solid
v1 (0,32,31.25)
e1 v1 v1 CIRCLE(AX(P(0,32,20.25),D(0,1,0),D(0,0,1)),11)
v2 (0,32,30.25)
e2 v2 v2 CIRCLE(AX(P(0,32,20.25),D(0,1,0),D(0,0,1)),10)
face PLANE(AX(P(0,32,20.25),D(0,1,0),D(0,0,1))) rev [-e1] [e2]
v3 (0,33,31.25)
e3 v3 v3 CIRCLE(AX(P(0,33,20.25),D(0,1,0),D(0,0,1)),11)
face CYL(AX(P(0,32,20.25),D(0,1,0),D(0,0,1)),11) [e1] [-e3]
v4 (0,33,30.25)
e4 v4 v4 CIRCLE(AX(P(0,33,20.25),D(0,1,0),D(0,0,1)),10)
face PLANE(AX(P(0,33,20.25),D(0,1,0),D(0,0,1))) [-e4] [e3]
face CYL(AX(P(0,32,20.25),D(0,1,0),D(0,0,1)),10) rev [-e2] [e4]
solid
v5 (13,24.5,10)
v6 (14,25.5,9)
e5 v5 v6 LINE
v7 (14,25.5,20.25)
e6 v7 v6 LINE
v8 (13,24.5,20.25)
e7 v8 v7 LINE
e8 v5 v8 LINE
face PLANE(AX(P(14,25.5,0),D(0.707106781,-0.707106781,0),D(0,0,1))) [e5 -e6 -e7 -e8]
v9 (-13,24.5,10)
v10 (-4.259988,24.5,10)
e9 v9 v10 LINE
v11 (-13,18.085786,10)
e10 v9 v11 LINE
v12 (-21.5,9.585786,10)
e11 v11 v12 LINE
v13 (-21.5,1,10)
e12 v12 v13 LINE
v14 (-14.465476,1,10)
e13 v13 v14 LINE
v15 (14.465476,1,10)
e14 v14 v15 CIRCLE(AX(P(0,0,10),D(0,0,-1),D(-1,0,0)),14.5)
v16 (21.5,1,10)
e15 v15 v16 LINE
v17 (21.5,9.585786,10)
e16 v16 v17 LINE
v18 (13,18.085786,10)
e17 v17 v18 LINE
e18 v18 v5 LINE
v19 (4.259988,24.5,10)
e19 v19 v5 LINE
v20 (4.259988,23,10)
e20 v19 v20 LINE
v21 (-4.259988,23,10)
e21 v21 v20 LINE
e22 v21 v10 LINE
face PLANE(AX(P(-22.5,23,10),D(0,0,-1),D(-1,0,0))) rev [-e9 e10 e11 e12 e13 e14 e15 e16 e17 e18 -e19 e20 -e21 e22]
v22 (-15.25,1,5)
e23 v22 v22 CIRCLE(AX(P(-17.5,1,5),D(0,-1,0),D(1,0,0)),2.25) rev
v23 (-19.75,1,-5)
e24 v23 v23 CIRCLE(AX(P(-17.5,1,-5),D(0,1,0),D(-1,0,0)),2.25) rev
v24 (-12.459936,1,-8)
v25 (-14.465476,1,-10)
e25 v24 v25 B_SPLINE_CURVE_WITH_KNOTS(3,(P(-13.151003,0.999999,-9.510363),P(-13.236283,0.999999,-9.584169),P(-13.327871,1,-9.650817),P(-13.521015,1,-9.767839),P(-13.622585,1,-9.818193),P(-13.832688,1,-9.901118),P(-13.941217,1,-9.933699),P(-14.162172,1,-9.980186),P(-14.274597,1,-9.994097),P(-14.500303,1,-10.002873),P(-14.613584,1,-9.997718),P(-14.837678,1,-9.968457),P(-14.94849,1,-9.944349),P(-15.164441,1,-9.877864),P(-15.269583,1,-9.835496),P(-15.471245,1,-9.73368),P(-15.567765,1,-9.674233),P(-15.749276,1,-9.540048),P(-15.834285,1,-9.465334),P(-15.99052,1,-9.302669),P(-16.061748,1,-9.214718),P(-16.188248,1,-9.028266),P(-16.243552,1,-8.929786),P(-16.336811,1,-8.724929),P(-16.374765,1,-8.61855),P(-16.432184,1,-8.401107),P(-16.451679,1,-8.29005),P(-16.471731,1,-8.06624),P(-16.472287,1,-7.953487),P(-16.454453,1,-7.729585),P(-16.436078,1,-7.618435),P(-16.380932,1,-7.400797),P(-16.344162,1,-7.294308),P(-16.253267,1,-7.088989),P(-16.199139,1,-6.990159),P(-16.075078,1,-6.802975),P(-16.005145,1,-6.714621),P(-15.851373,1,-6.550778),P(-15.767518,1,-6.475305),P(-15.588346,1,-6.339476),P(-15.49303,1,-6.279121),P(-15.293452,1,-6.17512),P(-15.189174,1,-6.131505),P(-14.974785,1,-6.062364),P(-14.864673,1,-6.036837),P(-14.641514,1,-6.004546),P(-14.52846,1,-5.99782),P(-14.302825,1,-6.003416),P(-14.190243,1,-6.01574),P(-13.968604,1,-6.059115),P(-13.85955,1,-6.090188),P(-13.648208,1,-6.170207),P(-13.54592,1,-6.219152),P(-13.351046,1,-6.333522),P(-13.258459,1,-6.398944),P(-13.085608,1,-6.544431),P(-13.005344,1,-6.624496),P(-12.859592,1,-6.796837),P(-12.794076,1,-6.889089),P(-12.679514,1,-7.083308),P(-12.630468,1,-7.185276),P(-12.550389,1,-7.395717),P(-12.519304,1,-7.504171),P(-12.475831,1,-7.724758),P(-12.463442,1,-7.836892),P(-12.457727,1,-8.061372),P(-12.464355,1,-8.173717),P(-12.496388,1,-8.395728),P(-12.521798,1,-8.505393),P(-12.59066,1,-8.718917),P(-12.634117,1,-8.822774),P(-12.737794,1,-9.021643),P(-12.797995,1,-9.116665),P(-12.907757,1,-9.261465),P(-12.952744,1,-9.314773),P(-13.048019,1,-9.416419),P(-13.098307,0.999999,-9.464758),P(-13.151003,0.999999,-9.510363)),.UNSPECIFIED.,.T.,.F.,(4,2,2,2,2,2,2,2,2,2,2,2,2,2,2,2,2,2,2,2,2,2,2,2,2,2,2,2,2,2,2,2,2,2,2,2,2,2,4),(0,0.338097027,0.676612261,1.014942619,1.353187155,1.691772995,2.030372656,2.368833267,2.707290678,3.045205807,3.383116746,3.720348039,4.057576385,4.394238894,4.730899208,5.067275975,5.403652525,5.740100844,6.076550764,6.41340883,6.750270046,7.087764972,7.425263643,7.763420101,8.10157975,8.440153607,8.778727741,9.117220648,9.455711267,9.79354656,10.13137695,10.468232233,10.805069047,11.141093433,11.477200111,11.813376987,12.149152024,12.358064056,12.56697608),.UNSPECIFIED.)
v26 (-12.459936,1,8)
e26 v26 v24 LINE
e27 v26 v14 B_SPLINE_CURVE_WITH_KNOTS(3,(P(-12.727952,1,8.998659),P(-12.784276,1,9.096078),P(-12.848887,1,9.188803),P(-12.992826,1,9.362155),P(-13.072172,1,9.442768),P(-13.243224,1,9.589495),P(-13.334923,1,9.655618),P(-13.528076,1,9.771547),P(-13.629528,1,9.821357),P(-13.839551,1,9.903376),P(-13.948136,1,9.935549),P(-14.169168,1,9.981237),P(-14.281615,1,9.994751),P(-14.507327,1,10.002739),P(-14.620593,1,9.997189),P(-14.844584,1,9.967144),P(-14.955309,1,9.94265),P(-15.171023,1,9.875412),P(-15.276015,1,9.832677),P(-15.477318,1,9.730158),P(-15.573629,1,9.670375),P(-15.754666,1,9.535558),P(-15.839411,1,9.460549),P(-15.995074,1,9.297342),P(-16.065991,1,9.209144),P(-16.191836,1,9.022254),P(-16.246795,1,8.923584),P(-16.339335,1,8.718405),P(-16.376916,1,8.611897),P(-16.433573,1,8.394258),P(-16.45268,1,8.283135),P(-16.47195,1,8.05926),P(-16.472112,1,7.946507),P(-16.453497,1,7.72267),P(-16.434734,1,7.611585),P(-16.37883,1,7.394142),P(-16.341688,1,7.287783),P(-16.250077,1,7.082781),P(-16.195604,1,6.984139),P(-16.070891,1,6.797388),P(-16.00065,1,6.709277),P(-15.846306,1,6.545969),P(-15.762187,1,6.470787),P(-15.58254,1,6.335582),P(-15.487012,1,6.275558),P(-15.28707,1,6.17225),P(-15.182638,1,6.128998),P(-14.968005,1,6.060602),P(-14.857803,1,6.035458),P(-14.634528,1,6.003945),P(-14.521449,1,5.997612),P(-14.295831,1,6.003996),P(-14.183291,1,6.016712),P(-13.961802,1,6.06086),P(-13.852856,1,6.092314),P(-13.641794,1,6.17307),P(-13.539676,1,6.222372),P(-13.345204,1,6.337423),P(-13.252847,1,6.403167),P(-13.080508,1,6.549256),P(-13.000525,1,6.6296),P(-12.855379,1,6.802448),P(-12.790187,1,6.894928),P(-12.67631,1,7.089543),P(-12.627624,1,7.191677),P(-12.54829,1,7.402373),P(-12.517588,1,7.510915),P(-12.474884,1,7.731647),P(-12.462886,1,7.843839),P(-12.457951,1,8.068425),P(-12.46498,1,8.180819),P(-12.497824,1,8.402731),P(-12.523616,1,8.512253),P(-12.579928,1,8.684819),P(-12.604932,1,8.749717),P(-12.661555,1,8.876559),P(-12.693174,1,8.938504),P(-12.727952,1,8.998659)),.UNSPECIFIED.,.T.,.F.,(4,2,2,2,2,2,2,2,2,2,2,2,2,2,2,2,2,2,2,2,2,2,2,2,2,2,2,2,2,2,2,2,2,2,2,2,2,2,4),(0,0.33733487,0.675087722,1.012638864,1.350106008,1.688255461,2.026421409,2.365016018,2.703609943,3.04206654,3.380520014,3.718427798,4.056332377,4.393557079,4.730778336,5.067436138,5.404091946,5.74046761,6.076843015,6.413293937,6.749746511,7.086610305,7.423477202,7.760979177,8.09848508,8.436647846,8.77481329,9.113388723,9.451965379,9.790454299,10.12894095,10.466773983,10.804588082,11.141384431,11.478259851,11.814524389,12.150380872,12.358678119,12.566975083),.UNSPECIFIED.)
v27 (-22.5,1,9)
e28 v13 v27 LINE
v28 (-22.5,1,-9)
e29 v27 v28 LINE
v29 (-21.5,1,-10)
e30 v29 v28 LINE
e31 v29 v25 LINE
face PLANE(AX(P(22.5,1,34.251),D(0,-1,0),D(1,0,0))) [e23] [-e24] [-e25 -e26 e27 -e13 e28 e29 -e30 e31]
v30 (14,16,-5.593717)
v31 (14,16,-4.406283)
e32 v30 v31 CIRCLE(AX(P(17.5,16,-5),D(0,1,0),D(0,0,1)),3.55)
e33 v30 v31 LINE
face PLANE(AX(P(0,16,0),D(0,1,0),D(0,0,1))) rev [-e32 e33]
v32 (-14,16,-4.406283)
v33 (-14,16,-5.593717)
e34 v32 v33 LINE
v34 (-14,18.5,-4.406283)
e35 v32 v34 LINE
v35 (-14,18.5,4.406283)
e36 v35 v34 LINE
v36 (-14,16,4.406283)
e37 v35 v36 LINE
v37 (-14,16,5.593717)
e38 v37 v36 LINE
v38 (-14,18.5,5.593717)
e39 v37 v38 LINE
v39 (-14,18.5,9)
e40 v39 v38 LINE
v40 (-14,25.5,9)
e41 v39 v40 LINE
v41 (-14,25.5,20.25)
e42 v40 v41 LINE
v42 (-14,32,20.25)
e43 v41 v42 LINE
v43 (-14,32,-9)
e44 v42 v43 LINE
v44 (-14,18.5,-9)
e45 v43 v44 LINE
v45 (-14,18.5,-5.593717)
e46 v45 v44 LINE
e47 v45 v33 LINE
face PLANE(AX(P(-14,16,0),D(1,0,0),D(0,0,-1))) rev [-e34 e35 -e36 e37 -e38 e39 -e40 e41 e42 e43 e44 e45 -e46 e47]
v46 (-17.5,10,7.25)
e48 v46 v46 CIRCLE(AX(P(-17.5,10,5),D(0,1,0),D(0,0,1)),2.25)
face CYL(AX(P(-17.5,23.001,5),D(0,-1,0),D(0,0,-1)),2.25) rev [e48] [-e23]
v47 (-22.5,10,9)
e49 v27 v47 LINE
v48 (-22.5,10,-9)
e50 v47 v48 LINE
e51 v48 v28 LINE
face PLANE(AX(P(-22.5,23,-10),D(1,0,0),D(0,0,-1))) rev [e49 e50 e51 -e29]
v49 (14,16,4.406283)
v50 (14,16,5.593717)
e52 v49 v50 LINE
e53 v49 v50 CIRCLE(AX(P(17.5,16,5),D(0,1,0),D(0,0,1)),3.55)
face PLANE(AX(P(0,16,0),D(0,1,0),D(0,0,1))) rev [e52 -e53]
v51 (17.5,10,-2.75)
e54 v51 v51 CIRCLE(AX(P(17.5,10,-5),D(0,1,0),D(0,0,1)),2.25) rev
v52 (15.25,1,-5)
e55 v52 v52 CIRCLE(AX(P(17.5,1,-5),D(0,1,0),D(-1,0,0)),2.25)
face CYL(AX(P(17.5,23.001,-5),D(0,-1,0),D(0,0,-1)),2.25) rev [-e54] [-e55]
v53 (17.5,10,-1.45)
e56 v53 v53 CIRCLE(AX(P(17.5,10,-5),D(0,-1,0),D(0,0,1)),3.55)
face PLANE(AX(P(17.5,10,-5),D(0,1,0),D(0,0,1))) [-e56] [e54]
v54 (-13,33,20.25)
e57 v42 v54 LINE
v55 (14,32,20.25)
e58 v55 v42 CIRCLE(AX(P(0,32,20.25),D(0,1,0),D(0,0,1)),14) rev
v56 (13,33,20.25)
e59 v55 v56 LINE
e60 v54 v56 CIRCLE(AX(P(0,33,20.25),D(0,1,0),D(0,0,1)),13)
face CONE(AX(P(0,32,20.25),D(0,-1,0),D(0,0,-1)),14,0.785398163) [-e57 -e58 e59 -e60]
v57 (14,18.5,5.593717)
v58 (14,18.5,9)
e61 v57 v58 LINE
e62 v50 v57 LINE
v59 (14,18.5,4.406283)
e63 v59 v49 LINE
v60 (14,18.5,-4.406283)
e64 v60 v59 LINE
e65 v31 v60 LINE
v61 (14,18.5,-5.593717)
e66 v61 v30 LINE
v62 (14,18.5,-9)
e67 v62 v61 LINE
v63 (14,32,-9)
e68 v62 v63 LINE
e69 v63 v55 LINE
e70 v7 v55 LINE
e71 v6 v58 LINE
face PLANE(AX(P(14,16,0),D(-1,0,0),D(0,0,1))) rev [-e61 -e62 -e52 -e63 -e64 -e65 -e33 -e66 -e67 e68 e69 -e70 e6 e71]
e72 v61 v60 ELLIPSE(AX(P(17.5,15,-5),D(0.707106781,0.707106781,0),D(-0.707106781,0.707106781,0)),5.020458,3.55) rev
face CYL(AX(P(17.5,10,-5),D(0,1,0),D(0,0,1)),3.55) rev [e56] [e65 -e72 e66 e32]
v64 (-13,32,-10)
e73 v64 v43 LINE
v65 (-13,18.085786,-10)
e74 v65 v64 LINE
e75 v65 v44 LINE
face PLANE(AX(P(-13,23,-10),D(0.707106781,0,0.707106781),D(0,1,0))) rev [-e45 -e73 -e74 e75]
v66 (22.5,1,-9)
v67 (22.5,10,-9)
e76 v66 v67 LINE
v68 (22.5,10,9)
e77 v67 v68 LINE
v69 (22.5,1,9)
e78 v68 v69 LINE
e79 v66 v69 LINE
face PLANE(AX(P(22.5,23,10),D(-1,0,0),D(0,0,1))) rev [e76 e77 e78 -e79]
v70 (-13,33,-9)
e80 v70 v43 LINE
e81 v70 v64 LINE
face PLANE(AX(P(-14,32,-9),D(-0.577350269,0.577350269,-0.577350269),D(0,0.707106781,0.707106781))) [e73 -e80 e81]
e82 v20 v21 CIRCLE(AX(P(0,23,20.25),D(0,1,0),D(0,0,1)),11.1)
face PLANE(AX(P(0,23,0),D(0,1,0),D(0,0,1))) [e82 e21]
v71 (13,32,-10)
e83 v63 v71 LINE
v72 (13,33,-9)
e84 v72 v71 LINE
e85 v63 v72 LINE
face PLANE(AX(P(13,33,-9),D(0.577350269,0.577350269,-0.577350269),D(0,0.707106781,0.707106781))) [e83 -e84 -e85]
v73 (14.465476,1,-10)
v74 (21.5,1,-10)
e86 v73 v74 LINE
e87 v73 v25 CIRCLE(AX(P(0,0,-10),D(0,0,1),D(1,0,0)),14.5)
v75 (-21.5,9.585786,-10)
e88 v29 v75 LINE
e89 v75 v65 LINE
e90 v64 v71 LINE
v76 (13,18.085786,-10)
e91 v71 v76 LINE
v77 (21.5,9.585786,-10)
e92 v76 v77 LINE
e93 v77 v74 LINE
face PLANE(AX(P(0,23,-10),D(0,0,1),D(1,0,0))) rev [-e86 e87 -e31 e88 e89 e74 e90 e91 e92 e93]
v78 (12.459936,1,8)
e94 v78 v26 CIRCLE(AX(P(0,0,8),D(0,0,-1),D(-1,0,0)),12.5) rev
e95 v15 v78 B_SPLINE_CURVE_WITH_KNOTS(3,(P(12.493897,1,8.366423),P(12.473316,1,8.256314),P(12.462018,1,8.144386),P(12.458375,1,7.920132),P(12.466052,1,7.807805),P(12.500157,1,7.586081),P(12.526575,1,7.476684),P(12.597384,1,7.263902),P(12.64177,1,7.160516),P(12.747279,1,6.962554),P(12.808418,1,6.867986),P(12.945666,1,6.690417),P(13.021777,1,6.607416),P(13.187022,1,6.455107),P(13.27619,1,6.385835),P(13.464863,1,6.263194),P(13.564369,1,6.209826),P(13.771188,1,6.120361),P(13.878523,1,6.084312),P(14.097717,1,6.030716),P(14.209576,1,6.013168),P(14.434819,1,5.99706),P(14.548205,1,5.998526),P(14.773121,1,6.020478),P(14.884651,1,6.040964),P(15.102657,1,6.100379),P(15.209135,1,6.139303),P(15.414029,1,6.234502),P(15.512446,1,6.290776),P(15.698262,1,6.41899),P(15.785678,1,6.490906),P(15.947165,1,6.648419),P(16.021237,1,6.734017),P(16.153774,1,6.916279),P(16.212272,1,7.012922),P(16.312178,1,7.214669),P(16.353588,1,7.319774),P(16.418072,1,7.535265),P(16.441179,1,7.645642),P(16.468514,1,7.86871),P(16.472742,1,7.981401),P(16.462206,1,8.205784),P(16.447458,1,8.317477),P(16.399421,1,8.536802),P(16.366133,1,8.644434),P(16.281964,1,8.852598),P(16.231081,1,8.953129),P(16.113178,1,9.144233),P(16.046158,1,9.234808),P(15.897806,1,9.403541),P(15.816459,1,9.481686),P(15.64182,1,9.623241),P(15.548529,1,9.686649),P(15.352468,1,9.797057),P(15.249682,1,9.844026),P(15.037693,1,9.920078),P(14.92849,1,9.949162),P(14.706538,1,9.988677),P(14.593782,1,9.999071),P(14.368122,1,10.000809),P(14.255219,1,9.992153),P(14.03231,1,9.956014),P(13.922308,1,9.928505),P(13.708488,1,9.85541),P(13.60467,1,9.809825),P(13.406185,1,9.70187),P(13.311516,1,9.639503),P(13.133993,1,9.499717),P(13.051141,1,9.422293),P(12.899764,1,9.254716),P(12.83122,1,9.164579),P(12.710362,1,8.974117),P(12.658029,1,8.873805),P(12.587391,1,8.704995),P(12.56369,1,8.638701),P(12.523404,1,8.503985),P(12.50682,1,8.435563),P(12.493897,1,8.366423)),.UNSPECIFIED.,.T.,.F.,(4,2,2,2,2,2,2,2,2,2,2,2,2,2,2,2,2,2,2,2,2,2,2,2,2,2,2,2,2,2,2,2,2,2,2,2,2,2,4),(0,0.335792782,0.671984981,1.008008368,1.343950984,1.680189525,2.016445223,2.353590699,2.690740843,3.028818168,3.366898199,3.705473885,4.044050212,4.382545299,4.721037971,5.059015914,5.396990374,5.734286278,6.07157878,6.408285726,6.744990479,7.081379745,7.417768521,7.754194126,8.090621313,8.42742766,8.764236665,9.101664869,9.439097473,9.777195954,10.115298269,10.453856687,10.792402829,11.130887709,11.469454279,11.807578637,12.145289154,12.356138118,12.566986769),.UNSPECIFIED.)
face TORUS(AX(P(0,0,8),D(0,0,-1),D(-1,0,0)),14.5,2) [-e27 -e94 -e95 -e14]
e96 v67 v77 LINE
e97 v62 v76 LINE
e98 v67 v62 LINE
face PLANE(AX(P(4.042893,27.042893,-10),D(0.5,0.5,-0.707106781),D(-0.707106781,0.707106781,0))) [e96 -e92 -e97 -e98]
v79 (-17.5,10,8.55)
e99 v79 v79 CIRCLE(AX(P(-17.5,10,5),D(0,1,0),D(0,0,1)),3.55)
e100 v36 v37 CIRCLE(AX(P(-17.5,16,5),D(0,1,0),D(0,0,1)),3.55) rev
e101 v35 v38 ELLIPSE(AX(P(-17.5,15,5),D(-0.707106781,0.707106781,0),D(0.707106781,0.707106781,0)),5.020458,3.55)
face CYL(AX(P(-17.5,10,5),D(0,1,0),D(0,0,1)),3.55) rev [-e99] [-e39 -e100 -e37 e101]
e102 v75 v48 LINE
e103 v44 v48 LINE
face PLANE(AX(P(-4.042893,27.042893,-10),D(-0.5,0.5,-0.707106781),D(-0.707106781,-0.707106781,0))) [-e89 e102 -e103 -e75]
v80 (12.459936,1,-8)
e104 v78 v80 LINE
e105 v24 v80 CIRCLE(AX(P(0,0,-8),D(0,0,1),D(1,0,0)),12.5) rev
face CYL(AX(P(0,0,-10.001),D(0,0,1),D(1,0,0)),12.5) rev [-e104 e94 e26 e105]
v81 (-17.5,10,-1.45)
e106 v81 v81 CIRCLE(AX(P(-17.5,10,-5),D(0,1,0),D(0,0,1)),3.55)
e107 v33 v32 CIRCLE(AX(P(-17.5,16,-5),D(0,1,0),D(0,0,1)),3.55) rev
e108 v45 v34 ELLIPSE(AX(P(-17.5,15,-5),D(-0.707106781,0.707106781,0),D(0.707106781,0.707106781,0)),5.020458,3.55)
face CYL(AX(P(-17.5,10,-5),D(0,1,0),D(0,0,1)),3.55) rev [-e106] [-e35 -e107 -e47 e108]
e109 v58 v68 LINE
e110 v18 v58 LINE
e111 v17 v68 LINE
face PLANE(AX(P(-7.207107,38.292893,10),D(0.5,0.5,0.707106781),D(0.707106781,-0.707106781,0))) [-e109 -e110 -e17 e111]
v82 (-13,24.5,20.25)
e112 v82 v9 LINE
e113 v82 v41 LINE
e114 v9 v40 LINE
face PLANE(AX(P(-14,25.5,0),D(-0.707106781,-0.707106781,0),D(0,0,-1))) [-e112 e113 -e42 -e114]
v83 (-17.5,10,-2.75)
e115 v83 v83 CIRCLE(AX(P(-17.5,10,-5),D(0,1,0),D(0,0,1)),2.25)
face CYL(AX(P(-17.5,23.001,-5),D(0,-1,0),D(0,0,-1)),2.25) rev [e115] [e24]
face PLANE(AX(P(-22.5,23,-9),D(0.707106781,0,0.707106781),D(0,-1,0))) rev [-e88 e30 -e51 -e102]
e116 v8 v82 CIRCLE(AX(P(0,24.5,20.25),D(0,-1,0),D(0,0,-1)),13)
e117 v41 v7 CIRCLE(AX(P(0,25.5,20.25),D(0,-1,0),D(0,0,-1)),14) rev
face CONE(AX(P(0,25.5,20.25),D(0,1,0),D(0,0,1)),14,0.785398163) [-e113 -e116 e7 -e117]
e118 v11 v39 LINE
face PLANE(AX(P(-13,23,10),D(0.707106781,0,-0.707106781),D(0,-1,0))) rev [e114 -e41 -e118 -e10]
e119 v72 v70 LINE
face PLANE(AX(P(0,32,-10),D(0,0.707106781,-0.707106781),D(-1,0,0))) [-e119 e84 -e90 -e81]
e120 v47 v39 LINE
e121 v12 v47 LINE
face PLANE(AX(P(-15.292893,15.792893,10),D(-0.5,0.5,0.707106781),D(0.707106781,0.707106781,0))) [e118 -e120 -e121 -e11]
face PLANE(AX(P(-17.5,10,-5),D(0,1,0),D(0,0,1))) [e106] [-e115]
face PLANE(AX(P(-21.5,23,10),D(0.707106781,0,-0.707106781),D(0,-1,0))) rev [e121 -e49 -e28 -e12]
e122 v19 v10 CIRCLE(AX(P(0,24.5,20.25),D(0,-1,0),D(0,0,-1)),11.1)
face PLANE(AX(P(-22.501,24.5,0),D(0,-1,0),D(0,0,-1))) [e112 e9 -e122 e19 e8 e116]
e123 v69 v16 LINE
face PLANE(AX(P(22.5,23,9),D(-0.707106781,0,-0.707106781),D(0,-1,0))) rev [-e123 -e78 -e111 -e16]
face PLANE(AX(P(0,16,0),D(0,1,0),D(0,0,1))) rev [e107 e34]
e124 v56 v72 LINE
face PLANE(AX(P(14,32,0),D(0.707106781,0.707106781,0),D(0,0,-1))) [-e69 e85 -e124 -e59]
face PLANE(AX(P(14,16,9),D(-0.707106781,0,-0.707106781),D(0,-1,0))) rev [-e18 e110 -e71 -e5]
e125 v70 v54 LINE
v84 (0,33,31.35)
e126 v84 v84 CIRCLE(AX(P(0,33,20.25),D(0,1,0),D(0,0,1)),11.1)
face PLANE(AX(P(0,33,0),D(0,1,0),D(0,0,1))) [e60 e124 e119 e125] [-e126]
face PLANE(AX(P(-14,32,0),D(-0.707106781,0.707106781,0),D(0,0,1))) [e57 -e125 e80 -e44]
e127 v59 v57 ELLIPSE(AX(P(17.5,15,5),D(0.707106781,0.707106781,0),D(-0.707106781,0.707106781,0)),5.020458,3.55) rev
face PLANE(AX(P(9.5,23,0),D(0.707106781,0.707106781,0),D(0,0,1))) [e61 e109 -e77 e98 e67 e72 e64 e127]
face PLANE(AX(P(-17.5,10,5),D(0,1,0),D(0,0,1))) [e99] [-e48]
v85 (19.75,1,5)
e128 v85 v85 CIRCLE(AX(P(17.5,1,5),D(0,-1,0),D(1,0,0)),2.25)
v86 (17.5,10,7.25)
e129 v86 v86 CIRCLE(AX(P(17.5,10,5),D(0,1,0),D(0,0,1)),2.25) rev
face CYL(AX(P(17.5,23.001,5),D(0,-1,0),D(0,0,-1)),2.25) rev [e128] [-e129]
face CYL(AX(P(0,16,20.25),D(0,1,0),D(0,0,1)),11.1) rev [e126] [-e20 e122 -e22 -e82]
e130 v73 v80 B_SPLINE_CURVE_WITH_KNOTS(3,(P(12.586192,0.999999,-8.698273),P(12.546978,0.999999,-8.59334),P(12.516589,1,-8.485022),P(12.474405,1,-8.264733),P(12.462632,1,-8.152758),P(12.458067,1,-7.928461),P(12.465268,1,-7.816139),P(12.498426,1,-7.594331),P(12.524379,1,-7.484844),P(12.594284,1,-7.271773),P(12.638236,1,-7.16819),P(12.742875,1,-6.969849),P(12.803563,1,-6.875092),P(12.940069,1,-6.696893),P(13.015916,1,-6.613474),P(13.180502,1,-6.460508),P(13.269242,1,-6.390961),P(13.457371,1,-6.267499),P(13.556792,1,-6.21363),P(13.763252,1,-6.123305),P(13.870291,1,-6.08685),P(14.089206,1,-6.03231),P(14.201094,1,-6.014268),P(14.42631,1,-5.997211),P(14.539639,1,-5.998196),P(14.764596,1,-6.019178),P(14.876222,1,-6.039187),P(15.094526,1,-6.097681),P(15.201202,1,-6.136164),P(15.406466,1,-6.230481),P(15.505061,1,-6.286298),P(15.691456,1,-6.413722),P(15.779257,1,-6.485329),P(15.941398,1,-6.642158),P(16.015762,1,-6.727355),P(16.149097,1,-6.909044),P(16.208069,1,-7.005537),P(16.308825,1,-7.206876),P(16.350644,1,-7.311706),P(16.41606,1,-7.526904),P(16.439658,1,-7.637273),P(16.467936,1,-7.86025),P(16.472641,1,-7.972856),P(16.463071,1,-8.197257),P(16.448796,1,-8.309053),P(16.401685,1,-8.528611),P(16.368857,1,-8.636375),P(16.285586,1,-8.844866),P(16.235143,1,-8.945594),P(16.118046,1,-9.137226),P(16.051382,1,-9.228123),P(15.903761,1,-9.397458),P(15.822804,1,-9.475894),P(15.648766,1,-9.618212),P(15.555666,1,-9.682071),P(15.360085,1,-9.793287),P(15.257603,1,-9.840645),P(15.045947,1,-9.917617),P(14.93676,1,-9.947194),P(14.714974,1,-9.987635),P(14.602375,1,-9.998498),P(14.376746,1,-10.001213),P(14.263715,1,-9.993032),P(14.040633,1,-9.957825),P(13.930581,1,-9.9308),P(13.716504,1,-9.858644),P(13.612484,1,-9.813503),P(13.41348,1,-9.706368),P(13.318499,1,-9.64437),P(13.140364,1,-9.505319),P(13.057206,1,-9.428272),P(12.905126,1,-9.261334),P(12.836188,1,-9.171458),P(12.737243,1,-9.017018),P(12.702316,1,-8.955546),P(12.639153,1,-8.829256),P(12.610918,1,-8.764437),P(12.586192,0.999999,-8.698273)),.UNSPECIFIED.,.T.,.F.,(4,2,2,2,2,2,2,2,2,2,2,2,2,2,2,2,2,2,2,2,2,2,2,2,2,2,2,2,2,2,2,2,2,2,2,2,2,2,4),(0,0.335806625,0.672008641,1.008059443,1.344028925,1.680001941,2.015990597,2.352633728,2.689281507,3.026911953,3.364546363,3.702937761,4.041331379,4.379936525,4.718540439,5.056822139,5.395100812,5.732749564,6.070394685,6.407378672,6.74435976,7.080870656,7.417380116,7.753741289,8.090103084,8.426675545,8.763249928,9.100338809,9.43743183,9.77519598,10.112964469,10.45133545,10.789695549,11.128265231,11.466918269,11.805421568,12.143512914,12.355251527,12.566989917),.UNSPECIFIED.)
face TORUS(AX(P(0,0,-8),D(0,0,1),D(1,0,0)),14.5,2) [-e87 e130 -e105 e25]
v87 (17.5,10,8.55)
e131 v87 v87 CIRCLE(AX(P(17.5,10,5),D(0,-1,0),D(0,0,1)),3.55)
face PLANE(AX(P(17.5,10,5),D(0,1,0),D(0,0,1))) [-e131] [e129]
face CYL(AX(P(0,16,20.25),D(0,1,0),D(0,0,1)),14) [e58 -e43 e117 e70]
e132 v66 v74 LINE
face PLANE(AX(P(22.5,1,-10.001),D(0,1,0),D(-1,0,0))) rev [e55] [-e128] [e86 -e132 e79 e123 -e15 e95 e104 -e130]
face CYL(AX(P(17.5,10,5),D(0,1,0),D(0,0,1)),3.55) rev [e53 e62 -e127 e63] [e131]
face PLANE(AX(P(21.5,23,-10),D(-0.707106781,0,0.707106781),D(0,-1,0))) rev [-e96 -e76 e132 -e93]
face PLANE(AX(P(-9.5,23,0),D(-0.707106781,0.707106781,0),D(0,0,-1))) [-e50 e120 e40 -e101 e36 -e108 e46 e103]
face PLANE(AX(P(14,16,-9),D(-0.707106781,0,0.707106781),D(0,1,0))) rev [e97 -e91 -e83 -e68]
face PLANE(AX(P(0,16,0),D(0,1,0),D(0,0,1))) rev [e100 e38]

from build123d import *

# Parameters (mm, degrees)
BOSS_EXTRUDE1_DEPTH      = 23
CUT_EXTRUDE1_REACH       = 39.885
CUT_EXTRUDE2_REACH       = 35.693
SKETCH3_R                = 2.25
CUT_EXTRUDE3_START       = 23
SKETCH4_R                = 3.55
CUT_EXTRUDE3_DEPTH       = 13
FILLET1_R                = 2
CHAMFER1_SIZE            = 13
BOSS_EXTRUDE2_DEPTH      = 10
BOSS_EXTRUDE2_DEPTH_BACK = 7
SKETCH6_R                = 11.1
CUT_EXTRUDE4_START       = -128
SKETCH7_W                = 24.25
SKETCH7_H                = 8.5
CUT_EXTRUDE4_DEPTH       = 28
EXTRUDE_THIN1_START      = -10
SKETCH8_R                = 11
SKETCH8_R_2              = 10
EXTRUDE_THIN1_DEPTH      = 1
CHAMFER2_SIZE            = 1
CUT_EXTRUDE5_DEPTH       = 10
CUT_EXTRUDE5_DEPTH_BACK  = 10
SKETCH9_W                = 45
SKETCH9_H                = 1


with BuildPart() as part:
    # Sketch1 → Boss-Extrude1 (new body)
    with BuildSketch(Plane(origin=(0, 0, 0), x_dir=(1, 0, 0), z_dir=(0, 1, 0))):
        Polygon((0, 10), (-22.5, 10), (-22.5, -10), (22.5, -10), (22.5, 10), align=None)
    extrude(amount=BOSS_EXTRUDE1_DEPTH)

    # Sketch2 → Cut-Extrude1 (cut, up to next)
    with BuildSketch(Plane.XY.offset(10), mode=Mode.PRIVATE) as cut_extrude1_sk1:
        with BuildLine():
            Line((-12.5, 0), (-22.5, 0))
            Line((-22.5, 0), (-22.5, -2.522641864))
            Line((-22.5, -2.522641864), (22.5, -2.522641864))
            Line((22.5, -2.522641864), (22.5, 0))
            Line((22.5, 0), (12.5, 0))
            ThreePointArc((12.5, 0), (0, 12.5), (-12.5, 0))
        make_face()
    cut_extrude1_tool1 = extrude(cut_extrude1_sk1.sketch, amount=-CUT_EXTRUDE1_REACH, mode=Mode.PRIVATE) & part.part
    add(cut_extrude1_tool1.solids().sort_by_distance((0, 3.22853, 10))[0], mode=Mode.SUBTRACT)

    # Sketch3 → Cut-Extrude2 (cut, up to next)
    with BuildSketch(Plane(origin=(0, 0, 0), x_dir=(1, 0, 0), z_dir=(0, 1, 0)), mode=Mode.PRIVATE) as cut_extrude2_sk1:
        with Locations(Location((-17.5, -5, 0), (0, 0, 270))):
            Circle(SKETCH3_R)
    cut_extrude2_tool1 = extrude(cut_extrude2_sk1.sketch, amount=CUT_EXTRUDE2_REACH, mode=Mode.PRIVATE) & part.part
    # Sketch3 → Cut-Extrude2 (cut, up to next)
    with BuildSketch(Plane(origin=(0, 0, 0), x_dir=(1, 0, 0), z_dir=(0, 1, 0)), mode=Mode.PRIVATE) as cut_extrude2_sk2:
        with Locations(Location((-17.5, 5, 0), (0, 0, 270))):
            Circle(SKETCH3_R)
    cut_extrude2_tool2 = extrude(cut_extrude2_sk2.sketch, amount=CUT_EXTRUDE2_REACH, mode=Mode.PRIVATE) & part.part
    cut_extrude2_1 = cut_extrude2_tool1.solids().sort_by_distance((-17.5, 0, 5))[0]
    add(cut_extrude2_1, mode=Mode.SUBTRACT)
    cut_extrude2_2 = cut_extrude2_tool2.solids().sort_by_distance((-17.5, 0, -5))[0]
    add(cut_extrude2_2, mode=Mode.SUBTRACT)
    cut_extrude2 = cut_extrude2_1 + cut_extrude2_2  # Cut-Extrude2 as one shape, for the pattern or mirror that repeats it

    # Mirror1: Cut-Extrude2 across plane
    add(cut_extrude2.mirror(Plane(origin=(0, 0, 0), x_dir=(0, 0, 1), z_dir=(1, 0, 0))), mode=Mode.SUBTRACT)

    # Sketch4 → Cut-Extrude3 (cut)
    with BuildSketch(Plane(origin=(0, 0, 0), x_dir=(1, 0, 0), z_dir=(0, 1, 0)).offset(CUT_EXTRUDE3_START)):
        with Locations(Location((-17.5, 5, 0), (0, 0, 270))):
            Circle(SKETCH4_R)
        with Locations(Location((-17.5, -5, 0), (0, 0, 270))):
            Circle(SKETCH4_R)
    cut_extrude3 = extrude(amount=-CUT_EXTRUDE3_DEPTH, mode=Mode.SUBTRACT)

    # Mirror2: Cut-Extrude3 across plane
    add(cut_extrude3.mirror(Plane(origin=(0, 0, 0), x_dir=(0, 0, 1), z_dir=(1, 0, 0))), mode=Mode.SUBTRACT)

    # Fillet1
    fillet1_edges = [part.edges().sort_by_distance(p)[0] for p in [
        (0, 12.5, 10),
        (0, 12.5, -10),
    ]]
    fillet(fillet1_edges, radius=FILLET1_R)

    # Chamfer1
    # the kernel refuses this chamfer: 13 mm, written as the material it takes off along each edge
    with BuildSketch(Plane(origin=(-22.5, 23, -43.431878844), x_dir=(0.9996219169112968, 0.027495876610586424, 0), z_dir=(0, 0, 1))) as chamfer1_piece_1:
        Polygon((CHAMFER1_SIZE * 0.999621916911, -CHAMFER1_SIZE * 0.0274958766106), (-CHAMFER1_SIZE * 0.0274958766106, -CHAMFER1_SIZE * 0.999621916911), (0, 0), align=None)
    extrude(amount=86.863757687, mode=Mode.SUBTRACT)
    with BuildSketch(Plane(origin=(22.5, 23, 43.431878844), x_dir=(0.027495876610586424, -0.9996219169112968, 0), z_dir=(0, 0, -1))) as chamfer1_piece_2:
        Polygon((CHAMFER1_SIZE * 0.999621916911, CHAMFER1_SIZE * 0.0274958766106), (-CHAMFER1_SIZE * 0.0274958766106, CHAMFER1_SIZE * 0.999621916911), (0, 0), align=None)
    extrude(amount=86.863757687, mode=Mode.SUBTRACT)

    # Sketch6 → Boss-Extrude2 (add, two sides: drawn at the far end of the back side and taken through both)
    with BuildSketch(Plane(origin=(0, 23, 0), x_dir=(1, 0, 0), z_dir=(0, 1, 0)).offset(-BOSS_EXTRUDE2_DEPTH_BACK)):
        with BuildLine():
            ThreePointArc((14, -20.25), (0, -34.25), (-14, -20.25))
            Line((-14, -20.25), (-14, -10))
            Line((-14, -10), (-14, 10))
            Line((-14, 10), (14, 10))
            Line((14, 10), (14, -10))
            Line((14, -10), (14, -20.25))
        make_face()
        with Locations(Location((0, -20.25, 0), (0, 0, 270))):
            Circle(SKETCH6_R, mode=Mode.SUBTRACT)
    extrude(amount=BOSS_EXTRUDE2_DEPTH + BOSS_EXTRUDE2_DEPTH_BACK)

    # Sketch7 → Cut-Extrude4 (cut)
    with BuildSketch(Plane(origin=(114, 0, 0), x_dir=(0, 0, -1), z_dir=(1, 0, 0)).offset(CUT_EXTRUDE4_START)):
        with Locations((-22.125, 20.25)):
            Rectangle(SKETCH7_W, SKETCH7_H)
    extrude(amount=CUT_EXTRUDE4_DEPTH, mode=Mode.SUBTRACT)

    # Chamfer2
    chamfer2_edges = [part.edges().sort_by_distance(p)[0] for p in [
        (14, 25.75, -10),
        (14, 33, 5.125),
        (-14, 33, 5.125),
        (0, 33, 34.25),
        (-14, 25.75, -10),
        (0, 33, -10),
        (-14, 24.5, 15.125),
        (0, 24.5, 34.25),
        (14, 24.5, 15.125),
        (14, 21.5, 10),
        (-14, 21.5, 10),
        (-22.5, 5, -10),
        (22.5, 5, -10),
        (-18.25, 14.25, -10),
        (22.5, 5, 10),
        (-22.5, 5, 10),
        (18.25, 14.25, 10),
        (-18.25, 14.25, 10),
        (18.25, 14.25, -10),
    ]]
    chamfer(chamfer2_edges, length=CHAMFER2_SIZE)

    # Sketch9 → Cut-Extrude5 (cut, two sides: drawn at the far end of the back side and taken through both)
    with BuildSketch(Plane.XY.offset(-CUT_EXTRUDE5_DEPTH_BACK)):
        with Locations((0, 0.5)):
            Rectangle(SKETCH9_W, SKETCH9_H)
    extrude(amount=CUT_EXTRUDE5_DEPTH + CUT_EXTRUDE5_DEPTH_BACK, mode=Mode.SUBTRACT)


with BuildPart() as body_2:
    # Sketch8 → Extrude-Thin1 (new body)
    with BuildSketch(Plane(origin=(0, 43, 0), x_dir=(1, 0, 0), z_dir=(0, 1, 0)).offset(EXTRUDE_THIN1_START)):
        with Locations((0, -20.25)):
            Circle(SKETCH8_R)
        with Locations((0, -20.25)):
            Circle(SKETCH8_R_2, mode=Mode.SUBTRACT)
    extrude(amount=-EXTRUDE_THIN1_DEPTH)


solid = Compound([part.part, body_2.part])
